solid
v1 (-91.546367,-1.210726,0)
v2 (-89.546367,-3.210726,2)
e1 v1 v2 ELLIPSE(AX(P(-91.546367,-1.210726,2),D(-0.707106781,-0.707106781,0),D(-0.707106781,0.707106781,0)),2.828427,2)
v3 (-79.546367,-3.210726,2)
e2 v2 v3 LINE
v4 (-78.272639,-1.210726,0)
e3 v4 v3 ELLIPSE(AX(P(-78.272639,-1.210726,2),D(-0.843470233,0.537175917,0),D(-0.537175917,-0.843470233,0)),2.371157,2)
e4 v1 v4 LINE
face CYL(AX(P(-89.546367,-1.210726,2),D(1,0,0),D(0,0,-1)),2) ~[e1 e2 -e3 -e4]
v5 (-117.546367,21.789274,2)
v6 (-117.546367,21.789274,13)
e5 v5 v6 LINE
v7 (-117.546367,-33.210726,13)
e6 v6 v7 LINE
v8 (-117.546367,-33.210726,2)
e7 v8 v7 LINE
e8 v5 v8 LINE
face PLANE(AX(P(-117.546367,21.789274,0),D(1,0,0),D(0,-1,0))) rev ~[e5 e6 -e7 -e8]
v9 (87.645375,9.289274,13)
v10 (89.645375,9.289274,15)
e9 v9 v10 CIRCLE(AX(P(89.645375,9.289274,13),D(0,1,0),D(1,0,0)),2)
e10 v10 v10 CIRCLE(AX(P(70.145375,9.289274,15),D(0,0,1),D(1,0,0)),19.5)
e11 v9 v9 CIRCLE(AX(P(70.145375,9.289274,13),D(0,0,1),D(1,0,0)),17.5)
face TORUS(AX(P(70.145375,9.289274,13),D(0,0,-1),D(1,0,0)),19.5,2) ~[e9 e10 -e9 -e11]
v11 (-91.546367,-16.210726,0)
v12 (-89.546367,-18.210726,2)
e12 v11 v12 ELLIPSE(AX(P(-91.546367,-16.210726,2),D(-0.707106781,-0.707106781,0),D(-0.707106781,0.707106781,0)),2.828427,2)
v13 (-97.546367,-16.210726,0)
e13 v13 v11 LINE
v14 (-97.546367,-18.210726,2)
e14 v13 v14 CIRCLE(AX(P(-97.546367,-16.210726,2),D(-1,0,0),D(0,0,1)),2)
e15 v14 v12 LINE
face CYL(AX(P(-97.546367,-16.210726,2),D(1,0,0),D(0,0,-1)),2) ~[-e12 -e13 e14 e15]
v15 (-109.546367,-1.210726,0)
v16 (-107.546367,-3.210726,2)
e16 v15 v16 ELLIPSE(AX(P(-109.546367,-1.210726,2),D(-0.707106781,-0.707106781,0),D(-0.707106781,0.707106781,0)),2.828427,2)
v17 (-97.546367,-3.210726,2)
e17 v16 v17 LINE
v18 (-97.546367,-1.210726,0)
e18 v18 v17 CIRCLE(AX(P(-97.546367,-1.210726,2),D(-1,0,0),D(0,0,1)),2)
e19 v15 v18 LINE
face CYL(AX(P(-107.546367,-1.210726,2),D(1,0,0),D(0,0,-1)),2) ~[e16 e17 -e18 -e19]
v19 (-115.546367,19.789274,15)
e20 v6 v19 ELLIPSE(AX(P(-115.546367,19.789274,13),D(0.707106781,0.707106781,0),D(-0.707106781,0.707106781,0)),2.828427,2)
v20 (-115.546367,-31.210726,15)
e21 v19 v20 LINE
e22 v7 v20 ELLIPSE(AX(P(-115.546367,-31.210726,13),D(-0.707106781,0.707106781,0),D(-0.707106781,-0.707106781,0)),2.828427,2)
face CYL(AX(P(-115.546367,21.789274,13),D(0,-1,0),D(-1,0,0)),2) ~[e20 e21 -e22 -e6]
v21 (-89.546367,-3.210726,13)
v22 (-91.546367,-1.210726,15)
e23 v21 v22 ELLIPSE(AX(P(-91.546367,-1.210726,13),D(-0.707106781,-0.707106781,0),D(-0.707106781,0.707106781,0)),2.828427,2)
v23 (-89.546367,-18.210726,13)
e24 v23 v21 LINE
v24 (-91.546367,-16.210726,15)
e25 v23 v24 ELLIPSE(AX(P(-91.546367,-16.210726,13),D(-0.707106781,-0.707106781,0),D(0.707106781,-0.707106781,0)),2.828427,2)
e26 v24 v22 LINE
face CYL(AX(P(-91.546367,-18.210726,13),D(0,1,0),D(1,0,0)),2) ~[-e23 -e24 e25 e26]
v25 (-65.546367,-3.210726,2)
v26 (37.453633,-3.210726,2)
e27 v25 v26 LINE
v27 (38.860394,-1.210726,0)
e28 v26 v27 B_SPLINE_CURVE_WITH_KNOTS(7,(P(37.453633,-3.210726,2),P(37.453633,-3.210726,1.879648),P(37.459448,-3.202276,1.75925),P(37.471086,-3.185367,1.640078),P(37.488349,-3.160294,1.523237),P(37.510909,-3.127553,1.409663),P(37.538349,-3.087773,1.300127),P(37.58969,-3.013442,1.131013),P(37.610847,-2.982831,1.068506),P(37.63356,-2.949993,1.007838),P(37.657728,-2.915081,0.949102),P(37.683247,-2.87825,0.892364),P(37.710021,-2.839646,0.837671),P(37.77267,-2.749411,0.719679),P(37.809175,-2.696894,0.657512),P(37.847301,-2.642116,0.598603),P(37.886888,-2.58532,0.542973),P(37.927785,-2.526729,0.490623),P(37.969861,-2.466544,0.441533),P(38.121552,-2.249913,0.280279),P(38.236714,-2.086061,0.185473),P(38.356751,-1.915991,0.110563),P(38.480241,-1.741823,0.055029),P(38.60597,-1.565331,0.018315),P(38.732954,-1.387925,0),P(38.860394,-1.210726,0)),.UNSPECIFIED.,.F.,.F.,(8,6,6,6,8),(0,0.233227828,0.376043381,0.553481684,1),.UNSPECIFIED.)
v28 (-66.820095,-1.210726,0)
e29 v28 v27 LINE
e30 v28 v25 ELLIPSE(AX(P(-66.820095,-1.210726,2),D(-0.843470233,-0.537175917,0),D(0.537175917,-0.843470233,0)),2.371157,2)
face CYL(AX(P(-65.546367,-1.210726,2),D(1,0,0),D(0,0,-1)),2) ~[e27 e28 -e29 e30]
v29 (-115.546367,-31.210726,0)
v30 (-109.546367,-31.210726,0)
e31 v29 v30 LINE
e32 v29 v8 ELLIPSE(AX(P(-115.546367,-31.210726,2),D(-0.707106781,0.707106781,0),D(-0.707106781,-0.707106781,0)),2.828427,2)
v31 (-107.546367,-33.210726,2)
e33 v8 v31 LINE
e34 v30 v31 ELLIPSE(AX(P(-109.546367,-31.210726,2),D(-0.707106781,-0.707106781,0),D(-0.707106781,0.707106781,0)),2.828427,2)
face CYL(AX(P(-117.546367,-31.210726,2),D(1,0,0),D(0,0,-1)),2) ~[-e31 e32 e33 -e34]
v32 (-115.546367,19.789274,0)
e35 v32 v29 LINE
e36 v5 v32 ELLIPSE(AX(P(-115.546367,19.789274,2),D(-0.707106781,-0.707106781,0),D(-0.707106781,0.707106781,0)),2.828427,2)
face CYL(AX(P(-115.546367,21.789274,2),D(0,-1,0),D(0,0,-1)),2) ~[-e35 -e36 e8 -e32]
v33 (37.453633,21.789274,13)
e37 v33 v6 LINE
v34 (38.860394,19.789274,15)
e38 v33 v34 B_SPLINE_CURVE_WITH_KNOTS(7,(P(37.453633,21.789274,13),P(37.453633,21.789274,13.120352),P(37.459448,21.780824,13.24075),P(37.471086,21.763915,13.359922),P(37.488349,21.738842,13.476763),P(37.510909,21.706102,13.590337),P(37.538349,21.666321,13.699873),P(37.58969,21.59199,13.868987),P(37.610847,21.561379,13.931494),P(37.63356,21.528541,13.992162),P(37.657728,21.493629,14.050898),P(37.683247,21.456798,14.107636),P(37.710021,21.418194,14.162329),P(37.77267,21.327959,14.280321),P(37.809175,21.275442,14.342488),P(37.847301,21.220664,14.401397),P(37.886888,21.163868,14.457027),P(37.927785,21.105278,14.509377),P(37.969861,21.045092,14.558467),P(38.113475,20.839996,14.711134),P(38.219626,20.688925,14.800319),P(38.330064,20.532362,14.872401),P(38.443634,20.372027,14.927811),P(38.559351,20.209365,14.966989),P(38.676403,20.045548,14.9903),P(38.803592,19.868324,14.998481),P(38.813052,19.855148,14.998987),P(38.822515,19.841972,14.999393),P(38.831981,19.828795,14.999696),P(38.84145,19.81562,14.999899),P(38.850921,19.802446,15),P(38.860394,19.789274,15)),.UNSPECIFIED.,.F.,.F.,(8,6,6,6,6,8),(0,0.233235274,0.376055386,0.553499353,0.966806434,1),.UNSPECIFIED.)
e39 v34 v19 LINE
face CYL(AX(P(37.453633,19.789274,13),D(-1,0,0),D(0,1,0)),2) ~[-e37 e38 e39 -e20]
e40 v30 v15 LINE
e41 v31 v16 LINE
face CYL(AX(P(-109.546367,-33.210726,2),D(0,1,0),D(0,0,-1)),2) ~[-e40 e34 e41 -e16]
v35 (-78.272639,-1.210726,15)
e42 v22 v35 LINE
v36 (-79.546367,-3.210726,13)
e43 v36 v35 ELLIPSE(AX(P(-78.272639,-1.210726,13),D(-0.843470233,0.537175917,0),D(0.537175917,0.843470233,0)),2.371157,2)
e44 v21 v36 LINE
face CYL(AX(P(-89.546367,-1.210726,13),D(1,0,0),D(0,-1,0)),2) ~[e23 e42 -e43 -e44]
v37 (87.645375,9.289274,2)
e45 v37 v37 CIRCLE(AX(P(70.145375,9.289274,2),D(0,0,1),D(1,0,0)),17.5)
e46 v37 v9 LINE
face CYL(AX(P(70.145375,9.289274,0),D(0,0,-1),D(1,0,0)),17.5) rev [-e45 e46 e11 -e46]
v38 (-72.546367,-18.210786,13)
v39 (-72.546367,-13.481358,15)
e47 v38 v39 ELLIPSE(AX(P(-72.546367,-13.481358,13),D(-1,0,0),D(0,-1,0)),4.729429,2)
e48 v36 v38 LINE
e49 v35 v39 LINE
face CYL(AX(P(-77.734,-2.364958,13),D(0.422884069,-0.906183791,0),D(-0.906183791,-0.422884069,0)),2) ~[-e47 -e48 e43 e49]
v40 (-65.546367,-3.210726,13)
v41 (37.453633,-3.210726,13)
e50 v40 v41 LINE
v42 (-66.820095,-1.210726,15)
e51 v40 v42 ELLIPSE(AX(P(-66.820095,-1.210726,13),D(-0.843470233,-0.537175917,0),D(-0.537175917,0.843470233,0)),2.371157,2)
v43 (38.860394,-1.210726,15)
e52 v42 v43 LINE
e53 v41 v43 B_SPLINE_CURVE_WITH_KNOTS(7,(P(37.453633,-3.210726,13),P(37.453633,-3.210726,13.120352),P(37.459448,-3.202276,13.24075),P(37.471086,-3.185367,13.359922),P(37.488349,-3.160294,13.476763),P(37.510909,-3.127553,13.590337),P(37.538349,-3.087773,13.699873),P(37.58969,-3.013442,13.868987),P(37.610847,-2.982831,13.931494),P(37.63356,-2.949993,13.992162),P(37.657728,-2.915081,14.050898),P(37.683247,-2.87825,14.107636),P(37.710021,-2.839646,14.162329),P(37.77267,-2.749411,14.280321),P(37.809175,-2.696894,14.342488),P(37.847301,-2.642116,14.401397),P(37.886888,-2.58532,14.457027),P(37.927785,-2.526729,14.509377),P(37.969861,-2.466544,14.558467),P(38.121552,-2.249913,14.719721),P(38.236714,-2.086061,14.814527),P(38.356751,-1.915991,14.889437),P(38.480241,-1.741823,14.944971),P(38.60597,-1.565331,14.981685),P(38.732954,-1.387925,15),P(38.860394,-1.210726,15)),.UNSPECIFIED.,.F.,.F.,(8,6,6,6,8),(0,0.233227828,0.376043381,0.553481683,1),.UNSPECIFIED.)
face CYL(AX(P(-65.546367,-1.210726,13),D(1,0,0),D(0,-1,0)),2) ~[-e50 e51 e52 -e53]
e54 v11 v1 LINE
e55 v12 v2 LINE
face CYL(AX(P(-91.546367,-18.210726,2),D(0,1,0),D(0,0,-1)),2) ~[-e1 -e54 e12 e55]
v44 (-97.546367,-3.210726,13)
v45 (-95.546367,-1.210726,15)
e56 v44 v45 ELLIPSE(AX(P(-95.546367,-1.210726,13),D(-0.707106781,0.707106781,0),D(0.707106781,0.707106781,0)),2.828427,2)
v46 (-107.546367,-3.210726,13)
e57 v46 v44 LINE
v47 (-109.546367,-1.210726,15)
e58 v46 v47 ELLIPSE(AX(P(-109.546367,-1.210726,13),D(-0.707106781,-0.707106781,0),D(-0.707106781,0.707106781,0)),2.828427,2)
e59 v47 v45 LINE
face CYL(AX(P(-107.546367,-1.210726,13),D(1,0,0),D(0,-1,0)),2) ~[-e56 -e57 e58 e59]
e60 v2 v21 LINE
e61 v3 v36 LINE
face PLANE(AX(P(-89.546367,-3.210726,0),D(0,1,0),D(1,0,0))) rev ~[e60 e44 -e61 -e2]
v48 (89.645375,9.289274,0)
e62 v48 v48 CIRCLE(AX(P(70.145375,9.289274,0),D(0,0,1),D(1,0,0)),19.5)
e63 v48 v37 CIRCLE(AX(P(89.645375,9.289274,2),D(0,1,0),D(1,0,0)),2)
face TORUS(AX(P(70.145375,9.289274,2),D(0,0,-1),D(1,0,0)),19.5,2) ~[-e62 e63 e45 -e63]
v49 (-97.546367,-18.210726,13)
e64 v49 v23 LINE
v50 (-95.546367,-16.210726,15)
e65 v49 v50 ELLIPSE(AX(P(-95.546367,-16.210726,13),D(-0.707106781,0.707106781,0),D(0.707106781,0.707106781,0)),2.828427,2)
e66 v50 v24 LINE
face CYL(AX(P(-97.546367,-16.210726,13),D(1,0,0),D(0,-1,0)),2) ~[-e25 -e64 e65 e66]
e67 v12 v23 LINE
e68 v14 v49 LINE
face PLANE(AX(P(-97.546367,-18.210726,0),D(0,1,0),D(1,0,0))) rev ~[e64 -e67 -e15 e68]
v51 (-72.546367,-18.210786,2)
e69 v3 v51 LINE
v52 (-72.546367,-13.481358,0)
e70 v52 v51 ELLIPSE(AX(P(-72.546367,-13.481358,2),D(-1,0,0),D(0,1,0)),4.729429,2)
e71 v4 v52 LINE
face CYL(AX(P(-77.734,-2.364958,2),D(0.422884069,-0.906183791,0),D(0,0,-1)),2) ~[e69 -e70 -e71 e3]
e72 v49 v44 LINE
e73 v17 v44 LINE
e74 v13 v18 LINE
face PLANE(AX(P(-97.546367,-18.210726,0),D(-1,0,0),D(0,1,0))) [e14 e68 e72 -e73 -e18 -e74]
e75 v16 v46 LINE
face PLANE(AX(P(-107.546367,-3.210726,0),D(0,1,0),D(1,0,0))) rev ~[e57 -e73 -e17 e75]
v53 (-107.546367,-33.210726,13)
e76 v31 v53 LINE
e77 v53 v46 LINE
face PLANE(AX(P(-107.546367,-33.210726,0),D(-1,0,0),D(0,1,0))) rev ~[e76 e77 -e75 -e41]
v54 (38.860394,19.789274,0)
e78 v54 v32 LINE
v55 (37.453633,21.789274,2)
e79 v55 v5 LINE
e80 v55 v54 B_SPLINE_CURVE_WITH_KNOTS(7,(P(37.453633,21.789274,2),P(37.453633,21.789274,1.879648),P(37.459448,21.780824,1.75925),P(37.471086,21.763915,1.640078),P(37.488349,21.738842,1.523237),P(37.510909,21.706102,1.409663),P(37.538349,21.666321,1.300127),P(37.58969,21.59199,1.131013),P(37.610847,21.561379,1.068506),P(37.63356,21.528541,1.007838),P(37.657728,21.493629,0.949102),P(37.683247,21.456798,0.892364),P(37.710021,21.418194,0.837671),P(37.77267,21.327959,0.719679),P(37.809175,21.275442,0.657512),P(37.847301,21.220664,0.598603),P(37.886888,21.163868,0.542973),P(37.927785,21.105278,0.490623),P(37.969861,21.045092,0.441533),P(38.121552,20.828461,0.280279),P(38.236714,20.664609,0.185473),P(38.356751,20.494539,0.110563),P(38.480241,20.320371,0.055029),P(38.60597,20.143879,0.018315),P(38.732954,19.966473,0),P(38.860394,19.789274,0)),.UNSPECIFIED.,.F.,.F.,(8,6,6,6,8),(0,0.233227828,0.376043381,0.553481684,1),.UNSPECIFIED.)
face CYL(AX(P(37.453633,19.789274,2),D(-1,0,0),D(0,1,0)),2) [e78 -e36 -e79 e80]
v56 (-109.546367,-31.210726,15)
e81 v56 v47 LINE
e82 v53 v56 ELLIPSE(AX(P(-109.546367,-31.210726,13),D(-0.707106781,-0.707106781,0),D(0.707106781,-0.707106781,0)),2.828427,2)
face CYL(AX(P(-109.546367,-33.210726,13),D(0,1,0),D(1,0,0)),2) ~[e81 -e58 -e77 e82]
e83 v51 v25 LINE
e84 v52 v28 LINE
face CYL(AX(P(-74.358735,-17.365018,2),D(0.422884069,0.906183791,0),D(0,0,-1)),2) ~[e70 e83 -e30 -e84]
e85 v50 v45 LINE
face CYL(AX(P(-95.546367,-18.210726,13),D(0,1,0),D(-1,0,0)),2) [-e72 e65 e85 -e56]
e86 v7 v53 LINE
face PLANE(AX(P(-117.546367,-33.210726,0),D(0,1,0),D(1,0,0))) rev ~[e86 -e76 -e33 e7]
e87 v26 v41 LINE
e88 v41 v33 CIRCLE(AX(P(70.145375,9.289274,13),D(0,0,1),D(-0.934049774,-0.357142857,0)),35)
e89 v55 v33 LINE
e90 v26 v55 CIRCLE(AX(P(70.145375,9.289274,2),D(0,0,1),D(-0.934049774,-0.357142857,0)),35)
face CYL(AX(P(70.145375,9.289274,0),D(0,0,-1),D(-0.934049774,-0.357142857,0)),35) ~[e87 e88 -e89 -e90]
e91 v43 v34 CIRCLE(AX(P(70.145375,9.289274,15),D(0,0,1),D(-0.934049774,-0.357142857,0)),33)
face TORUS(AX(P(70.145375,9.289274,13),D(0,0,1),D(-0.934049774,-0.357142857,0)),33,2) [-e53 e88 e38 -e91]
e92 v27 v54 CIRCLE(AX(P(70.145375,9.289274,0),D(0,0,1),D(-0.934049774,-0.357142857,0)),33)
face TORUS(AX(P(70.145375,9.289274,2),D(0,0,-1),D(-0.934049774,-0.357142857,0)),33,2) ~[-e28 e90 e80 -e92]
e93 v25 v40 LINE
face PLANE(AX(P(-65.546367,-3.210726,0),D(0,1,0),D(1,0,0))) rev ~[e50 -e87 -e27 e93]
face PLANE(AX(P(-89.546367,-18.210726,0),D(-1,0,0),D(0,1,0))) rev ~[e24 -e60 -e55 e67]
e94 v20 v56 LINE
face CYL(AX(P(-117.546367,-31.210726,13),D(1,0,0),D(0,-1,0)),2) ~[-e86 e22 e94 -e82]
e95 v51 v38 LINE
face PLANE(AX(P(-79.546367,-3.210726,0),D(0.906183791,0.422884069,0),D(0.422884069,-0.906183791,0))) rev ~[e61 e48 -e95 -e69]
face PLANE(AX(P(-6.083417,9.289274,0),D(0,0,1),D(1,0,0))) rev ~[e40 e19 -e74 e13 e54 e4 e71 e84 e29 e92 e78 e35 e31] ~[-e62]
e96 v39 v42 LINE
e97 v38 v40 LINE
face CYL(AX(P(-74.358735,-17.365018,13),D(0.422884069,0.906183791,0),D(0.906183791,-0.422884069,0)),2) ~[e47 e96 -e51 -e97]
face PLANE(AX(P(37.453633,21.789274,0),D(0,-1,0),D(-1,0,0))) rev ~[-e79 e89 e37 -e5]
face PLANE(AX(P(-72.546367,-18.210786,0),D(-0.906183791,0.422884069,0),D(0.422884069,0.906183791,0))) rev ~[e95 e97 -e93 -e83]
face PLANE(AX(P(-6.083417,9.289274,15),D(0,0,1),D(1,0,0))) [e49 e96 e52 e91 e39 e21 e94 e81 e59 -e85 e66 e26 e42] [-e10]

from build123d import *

# Parameters (mm, degrees)
F0_R     = 17.5
F0_W     = 10
F0_H     = 30
F0_W_2   = 8
F0_H_2   = 15
F1_DEPTH = 15
F2_R     = 2
F3_R     = 2


with BuildPart() as f1:
    # F0 (on Top) → F1 (new body)
    with BuildSketch(Plane.XY):
        with BuildLine():
            Line((37.453632827, 21.7892740583), (-117.546367173, 21.7892740583))
            Line((-117.546367173, 21.7892740583), (-117.546367173, -3.2107259417))
            Line((-117.546367173, -3.2107259417), (-107.546367173, -3.2107259417))
            Line((-107.546367173, -3.2107259417), (-97.546367173, -3.2107259417))
            Line((-97.546367173, -3.2107259417), (-89.546367173, -3.2107259417))
            Line((-89.546367173, -3.2107259417), (-79.546367173, -3.2107259417))
            Line((-79.546367173, -3.2107259417), (-65.546367173, -3.2107259417))
            Line((-65.546367173, -3.2107259417), (37.453632827, -3.2107259417))
            ThreePointArc((37.453632827, -3.2107259417), (105.1453749035, 9.2892740583), (37.453632827, 21.7892740583))
        make_face()
        with Locations((70.1453749035, 9.2892740583)):
            Circle(F0_R, mode=Mode.SUBTRACT)
        with Locations((-112.546367173, -18.2107259417)):
            Rectangle(F0_W, F0_H)
        Polygon((-72.546367173, -18.2107862416), (-65.546367173, -3.2107259417), (-79.546367173, -3.2107259417), align=None)
        with Locations((-93.546367173, -10.7107259417)):
            Rectangle(F0_W_2, F0_H_2)
    extrude(amount=F1_DEPTH)

    # F2
    f2_edges = [f1.edges().sort_by_distance(p)[0] for p in [
        (-40.046367, 21.789274, 15),
        (-117.546367, -5.710726, 15),
        (-112.546367, -33.210726, 15),
        (-107.546367, -18.210726, 15),
        (-102.546367, -3.210726, 15),
        (-97.546367, -10.710726, 15),
        (-93.546367, -18.210726, 15),
        (-89.546367, -10.710726, 15),
        (-84.546367, -3.210726, 15),
        (-76.046367, -10.710756, 15),
        (-69.046367, -10.710756, 15),
        (-14.046367, -3.210726, 15),
        (105.145375, 9.289274, 15),
        (52.645375, 9.289274, 15),
    ]]
    fillet(f2_edges, radius=F2_R)

    # F3
    f3_edges = [f1.edges().sort_by_distance(p)[0] for p in [
        (105.145375, 9.289274, 0),
        (52.645375, 9.289274, 0),
        (-40.046367, 21.789274, 0),
        (-14.046367, -3.210726, 0),
        (-69.046367, -10.710756, 0),
        (-89.546367, -10.710726, 0),
        (-93.546367, -18.210726, 0),
        (-107.546367, -18.210726, 0),
        (-117.546367, -5.710726, 0),
        (-112.546367, -33.210726, 0),
        (-102.546367, -3.210726, 0),
        (-76.046367, -10.710756, 0),
        (-84.546367, -3.210726, 0),
    ]]
    fillet(f3_edges, radius=F3_R)


solid = f1.part
